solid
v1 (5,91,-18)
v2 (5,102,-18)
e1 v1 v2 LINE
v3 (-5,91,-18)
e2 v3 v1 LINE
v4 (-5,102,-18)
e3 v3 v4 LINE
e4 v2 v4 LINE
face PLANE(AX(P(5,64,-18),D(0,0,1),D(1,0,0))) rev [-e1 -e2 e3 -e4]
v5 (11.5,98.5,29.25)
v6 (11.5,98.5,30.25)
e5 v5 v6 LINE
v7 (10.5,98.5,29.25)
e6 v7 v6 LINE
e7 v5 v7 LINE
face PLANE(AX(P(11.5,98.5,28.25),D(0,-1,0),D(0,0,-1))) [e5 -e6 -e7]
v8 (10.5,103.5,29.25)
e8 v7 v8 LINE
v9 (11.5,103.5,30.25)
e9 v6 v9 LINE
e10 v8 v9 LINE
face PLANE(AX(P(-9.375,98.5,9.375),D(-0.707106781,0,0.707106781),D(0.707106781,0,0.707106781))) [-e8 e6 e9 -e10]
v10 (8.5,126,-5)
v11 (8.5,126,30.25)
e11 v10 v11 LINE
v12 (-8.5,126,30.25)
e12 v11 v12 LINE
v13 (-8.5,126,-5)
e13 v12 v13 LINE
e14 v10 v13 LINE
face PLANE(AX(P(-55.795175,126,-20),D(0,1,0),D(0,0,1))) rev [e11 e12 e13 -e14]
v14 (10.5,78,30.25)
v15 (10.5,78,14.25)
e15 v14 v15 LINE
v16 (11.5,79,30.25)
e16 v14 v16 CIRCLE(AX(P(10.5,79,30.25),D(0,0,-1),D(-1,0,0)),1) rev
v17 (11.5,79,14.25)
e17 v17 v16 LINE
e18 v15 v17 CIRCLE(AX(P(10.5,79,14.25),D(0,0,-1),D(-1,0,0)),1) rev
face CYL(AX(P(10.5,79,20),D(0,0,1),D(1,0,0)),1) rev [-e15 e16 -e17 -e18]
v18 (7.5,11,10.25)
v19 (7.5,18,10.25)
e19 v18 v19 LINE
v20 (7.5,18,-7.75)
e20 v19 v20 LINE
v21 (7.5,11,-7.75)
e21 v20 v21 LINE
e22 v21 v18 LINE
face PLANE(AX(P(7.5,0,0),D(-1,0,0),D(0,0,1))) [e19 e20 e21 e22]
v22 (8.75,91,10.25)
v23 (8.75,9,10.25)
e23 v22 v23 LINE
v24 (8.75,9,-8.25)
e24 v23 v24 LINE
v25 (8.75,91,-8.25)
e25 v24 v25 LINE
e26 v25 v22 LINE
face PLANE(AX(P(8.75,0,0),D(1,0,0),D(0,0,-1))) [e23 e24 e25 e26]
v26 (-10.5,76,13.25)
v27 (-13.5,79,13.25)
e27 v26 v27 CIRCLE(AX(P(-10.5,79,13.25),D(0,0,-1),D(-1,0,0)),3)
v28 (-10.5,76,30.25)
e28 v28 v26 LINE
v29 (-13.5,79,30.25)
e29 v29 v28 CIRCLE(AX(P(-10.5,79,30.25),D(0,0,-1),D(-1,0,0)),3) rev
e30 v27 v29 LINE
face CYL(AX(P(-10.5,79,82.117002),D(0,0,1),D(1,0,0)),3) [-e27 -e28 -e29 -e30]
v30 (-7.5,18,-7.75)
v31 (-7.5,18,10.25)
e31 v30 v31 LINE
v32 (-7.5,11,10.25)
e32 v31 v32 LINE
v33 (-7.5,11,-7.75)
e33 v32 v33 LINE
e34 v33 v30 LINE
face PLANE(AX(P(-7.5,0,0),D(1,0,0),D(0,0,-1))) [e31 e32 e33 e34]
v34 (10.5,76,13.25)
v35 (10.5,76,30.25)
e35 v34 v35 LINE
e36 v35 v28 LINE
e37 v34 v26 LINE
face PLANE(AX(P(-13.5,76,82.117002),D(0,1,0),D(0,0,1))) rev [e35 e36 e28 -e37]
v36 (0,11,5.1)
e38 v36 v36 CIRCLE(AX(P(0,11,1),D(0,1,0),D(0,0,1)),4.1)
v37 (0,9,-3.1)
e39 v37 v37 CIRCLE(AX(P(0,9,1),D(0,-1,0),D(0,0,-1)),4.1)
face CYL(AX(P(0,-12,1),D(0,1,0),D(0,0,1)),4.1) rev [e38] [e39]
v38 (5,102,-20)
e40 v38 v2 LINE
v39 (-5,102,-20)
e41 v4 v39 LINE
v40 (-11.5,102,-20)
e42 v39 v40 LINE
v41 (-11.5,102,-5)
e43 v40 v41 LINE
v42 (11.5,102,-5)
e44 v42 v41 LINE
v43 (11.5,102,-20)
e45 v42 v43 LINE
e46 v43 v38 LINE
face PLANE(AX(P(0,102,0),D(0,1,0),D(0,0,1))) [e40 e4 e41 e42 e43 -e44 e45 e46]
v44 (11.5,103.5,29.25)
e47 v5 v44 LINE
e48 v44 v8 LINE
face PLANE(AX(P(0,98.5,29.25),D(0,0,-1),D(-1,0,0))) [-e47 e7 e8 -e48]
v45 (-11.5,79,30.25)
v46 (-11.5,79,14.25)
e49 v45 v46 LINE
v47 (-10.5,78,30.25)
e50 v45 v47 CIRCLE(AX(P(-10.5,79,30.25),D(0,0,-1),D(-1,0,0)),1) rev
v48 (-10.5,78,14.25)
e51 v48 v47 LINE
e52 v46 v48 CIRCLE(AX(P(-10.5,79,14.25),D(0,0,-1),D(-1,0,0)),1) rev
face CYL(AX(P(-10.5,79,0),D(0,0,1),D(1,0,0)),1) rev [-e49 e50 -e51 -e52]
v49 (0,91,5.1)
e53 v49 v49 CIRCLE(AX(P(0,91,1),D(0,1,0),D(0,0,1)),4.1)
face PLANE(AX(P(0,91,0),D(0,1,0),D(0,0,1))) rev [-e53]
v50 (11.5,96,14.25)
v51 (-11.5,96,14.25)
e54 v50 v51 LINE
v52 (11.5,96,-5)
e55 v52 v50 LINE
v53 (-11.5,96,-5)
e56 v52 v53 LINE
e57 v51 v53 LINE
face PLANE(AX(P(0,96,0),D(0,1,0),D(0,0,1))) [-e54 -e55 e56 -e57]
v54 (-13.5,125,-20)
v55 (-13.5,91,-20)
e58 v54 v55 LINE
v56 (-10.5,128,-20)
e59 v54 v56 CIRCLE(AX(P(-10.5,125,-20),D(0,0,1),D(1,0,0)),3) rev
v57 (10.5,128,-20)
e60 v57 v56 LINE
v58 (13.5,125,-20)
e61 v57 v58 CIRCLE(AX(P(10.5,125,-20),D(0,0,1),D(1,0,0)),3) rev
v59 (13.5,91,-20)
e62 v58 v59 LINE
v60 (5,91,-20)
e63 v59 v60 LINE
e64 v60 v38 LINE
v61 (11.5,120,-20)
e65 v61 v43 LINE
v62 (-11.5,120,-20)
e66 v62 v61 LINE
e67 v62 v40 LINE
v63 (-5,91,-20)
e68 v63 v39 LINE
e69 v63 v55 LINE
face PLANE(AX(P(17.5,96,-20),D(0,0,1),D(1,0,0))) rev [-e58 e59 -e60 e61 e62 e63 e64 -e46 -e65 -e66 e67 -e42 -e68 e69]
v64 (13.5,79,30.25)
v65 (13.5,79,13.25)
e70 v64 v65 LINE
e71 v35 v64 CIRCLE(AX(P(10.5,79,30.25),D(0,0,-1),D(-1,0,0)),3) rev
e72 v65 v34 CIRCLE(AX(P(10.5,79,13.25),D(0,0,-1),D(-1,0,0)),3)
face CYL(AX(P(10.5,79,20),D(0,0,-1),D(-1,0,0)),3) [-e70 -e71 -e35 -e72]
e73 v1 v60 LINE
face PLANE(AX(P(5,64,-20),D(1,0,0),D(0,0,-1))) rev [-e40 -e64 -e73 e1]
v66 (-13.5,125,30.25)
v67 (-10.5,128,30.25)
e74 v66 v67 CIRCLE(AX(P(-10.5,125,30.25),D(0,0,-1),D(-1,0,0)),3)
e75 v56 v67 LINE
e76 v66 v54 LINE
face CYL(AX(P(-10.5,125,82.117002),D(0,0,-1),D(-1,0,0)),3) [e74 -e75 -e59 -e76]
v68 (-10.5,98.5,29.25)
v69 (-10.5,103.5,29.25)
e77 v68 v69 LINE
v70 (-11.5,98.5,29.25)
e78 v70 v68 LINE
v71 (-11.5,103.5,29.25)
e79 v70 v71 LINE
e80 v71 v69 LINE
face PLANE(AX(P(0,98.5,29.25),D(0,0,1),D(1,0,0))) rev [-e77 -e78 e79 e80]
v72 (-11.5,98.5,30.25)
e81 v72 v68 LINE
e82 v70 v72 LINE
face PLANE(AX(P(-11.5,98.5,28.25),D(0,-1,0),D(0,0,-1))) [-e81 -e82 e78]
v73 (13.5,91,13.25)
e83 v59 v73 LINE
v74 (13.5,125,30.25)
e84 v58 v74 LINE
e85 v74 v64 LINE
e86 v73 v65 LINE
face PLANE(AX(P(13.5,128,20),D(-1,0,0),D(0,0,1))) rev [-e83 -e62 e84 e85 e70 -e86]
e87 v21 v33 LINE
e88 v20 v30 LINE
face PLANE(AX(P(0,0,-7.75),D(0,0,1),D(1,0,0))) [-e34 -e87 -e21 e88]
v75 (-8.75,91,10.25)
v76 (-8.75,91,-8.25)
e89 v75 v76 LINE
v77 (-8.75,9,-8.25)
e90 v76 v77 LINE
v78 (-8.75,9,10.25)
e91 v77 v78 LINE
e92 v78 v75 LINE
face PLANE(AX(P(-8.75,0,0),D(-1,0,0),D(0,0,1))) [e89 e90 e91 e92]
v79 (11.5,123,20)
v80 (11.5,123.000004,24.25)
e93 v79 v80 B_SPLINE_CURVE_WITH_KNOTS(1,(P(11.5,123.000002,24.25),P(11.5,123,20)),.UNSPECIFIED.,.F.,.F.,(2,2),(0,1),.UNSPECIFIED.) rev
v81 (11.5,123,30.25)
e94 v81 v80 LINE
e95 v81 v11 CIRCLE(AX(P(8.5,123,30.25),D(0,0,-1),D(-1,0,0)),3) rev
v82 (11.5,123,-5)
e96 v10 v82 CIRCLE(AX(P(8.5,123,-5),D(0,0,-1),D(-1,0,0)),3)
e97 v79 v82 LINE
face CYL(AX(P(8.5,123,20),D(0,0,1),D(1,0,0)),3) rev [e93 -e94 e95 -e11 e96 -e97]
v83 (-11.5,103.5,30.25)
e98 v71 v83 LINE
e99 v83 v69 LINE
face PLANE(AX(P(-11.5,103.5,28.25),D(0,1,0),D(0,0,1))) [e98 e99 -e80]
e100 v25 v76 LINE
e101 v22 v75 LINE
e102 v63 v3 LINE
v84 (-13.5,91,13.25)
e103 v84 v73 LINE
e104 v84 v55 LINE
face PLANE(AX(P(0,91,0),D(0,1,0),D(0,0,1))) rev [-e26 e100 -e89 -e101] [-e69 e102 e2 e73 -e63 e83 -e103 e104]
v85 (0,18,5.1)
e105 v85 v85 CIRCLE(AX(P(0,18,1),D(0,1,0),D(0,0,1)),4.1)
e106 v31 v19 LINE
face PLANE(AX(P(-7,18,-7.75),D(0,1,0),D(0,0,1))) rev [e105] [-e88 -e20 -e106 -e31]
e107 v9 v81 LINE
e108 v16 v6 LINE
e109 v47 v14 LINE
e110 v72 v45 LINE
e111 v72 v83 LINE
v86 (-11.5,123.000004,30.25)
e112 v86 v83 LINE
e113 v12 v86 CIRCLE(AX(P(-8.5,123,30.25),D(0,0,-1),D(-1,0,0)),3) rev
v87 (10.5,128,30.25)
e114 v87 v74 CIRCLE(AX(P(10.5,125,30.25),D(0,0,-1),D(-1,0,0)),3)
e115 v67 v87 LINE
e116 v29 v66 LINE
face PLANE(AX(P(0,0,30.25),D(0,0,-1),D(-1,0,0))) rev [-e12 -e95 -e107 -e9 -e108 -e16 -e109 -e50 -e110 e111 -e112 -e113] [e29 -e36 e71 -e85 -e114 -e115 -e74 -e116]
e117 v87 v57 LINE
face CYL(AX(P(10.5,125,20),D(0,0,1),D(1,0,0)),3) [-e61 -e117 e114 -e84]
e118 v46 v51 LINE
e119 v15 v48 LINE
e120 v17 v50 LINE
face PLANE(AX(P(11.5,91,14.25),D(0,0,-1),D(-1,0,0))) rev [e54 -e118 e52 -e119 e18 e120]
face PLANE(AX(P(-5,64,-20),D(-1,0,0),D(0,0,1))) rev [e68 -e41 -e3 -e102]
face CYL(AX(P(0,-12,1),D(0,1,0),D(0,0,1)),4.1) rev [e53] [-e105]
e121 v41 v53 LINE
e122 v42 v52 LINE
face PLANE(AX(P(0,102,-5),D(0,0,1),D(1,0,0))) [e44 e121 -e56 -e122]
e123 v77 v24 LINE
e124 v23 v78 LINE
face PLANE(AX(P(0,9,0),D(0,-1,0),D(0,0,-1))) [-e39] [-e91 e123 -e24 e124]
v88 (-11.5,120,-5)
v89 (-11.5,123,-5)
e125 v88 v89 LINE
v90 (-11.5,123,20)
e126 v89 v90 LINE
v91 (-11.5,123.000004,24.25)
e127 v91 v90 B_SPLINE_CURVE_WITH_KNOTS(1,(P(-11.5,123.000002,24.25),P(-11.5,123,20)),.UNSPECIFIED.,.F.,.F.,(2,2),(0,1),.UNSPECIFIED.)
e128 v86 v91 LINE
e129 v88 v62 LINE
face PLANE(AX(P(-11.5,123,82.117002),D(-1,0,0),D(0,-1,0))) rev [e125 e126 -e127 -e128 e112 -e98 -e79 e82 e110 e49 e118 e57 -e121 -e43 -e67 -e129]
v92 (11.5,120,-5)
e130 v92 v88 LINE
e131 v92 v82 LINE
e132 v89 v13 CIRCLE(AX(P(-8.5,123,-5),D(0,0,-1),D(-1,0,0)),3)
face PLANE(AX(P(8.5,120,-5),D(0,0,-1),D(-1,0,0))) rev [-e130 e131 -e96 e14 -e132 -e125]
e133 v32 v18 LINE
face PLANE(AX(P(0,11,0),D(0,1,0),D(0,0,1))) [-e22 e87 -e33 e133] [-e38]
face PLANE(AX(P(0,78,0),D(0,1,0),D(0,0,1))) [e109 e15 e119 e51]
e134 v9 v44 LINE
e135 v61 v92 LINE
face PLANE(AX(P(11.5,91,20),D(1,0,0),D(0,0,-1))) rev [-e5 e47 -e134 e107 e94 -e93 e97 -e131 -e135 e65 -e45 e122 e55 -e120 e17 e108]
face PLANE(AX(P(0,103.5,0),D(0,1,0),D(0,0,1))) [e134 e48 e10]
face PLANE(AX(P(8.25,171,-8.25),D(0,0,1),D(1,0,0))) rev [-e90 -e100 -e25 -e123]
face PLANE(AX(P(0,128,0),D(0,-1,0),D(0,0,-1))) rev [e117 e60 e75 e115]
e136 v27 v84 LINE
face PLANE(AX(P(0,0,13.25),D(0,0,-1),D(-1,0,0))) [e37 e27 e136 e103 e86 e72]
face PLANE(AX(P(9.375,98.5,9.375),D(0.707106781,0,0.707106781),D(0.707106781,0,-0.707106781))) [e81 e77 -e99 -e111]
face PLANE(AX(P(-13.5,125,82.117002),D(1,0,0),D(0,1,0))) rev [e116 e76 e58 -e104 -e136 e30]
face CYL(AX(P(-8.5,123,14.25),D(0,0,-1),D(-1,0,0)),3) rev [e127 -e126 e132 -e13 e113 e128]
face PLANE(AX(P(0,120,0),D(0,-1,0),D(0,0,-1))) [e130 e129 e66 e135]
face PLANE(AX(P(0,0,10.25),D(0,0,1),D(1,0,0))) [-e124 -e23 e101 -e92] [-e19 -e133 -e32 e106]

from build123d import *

# Parameters (mm, degrees)
SKETCH1_W                = 20
SKETCH1_H                = 20
SKETCH1_R                = 4
SKETCH1_H_2              = 10
BOSS_EXTRUDE2_DEPTH      = 2
SKETCH2_W                = 45
SKETCH2_H                = 60
SKETCH2_W_2              = 43
SKETCH2_H_2              = 58
BOSS_EXTRUDE3_DEPTH      = 4
SKETCH6_W                = 45
SKETCH6_H                = 30
BOSS_EXTRUDE4_DEPTH      = 2
CUT_EXTRUDE4_DEPTH       = 4
BOSS_EXTRUDE5_DEPTH      = 7
BOSS_EXTRUDE5_2_DEPTH    = 7
BOSS_EXTRUDE5_3_DEPTH    = 7
SKETCH11_W               = 19
SKETCH11_H               = 19
BOSS_EXTRUDE6_DEPTH      = 2
SKETCH14_R               = 4
CUT_EXTRUDE7_DEPTH       = 19
SKETCH15_W               = 1
SKETCH15_H               = 17
SKETCH15_H_2             = 1
BOSS_EXTRUDE7_DEPTH      = 80
SKETCH16_W               = 16.5
SKETCH16_H               = 16.5
BOSS_EXTRUDE8_DEPTH      = 80
SKETCH17_R               = 4
CUT_EXTRUDE8_DEPTH       = 193
SKETCH18_W               = 105.72576136
SKETCH18_H               = 91
CUT_EXTRUDE9_DEPTH       = 193
SKETCH19_W               = 10.5
SKETCH19_H               = 2
CUT_EXTRUDE10_DEPTH      = 193
SKETCH20_W               = 16.5
SKETCH20_H               = 16.5
SKETCH20_R               = 4
BOSS_EXTRUDE10_DEPTH     = 80
SKETCH21_W               = 16.5
SKETCH21_H               = 16.5
SKETCH21_R               = 4
CUT_EXTRUDE11_DEPTH      = 80
SKETCH22_W               = 14
SKETCH22_H               = 5
CUT_EXTRUDE12_DEPTH      = 16
SKETCH24_W               = 16.5
SKETCH24_H               = 80
SKETCH24_W_2             = 14
SKETCH24_H_2             = 5
BOSS_EXTRUDE11_DEPTH     = 2
SKETCH25_R               = 4.1
SKETCH25_R_2             = 4
CUT_EXTRUDE14_DEPTH      = 103
SKETCH26_W               = 35
SKETCH26_H               = 40
BOSS_EXTRUDE12_DEPTH     = 5
SKETCH27_W               = 23
SKETCH27_H               = 5.75
CUT_EXTRUDE17_DEPTH      = 5
SKETCH28_W               = 2
SKETCH28_H               = 40
BOSS_EXTRUDE13_DEPTH     = 32
SKETCH29_W               = 4
SKETCH29_H               = 40
CUT_EXTRUDE18_DEPTH      = 32
SKETCH30_W               = 4
SKETCH30_H               = 40
CUT_EXTRUDE19_DEPTH      = 32
SKETCH31_W               = 10
SKETCH31_H               = 2
CUT_EXTRUDE20_DEPTH      = 32
SKETCH34_W               = 44.25
SKETCH34_H               = 2
BOSS_EXTRUDE15_DEPTH     = 23
FILLET1_R                = 3
FILLET2_R                = 3
FILLET3_R                = 3
FILLET4_R                = 3
BOSS_EXTRUDE16_DEPTH     = 20
SKETCH36_W               = 10
SKETCH36_H               = 2
BOSS_EXTRUDE17_DEPTH     = 23
SKETCH37_W               = 27
SKETCH37_H               = 20
CUT_EXTRUDE23_DEPTH      = 1
SKETCH42_W               = 1
SKETCH42_H               = 5
BOSS_EXTRUDE22_DEPTH     = 2
SKETCH44_W               = 1
SKETCH44_H               = 2
BOSS_EXTRUDE23_DEPTH     = 2
SKETCH46_W               = 1
SKETCH46_H               = 2
BOSS_EXTRUDE24_DEPTH     = 3
SKETCH47_W               = 16.5
SKETCH47_H               = 18.5
SKETCH47_R               = 4.1
BOSS_EXTRUDE25_DEPTH     = 2
SKETCH50_W               = 14
SKETCH50_H               = 18
SKETCH50_R               = 4.1
CUT_EXTRUDE26_DEPTH      = 2
SKETCH51_W               = 18
SKETCH51_H               = 7
CUT_EXTRUDE27_DEPTH      = 0.5
SKETCH52_W               = 18
SKETCH52_H               = 7
CUT_EXTRUDE28_DEPTH      = 0.5
SKETCH53_W               = 18.5
SKETCH53_H               = 82
BOSS_EXTRUDE26_DEPTH     = 0.5
SKETCH54_W               = 18.5
SKETCH54_H               = 82
BOSS_EXTRUDE27_DEPTH     = 0.5
BOSS_EXTRUDE30_DEPTH     = 5
CUT_EXTRUDE31_REACH      = 138.104
SKETCH61_W               = 23
SKETCH61_H               = 5
CUT_EXTRUDE32_DEPTH      = 25
CUT_EXTRUDE32_DEPTH_BACK = 5
SKETCH62_W               = 6.75
SKETCH62_H               = 5
BOSS_EXTRUDE31_DEPTH     = 10.25
BOSS_EXTRUDE32_DEPTH     = 6
SKETCH65_W               = 23
SKETCH65_H               = 2
BOSS_EXTRUDE33_DEPTH     = 6
FILLET5_R                = 3
FILLET6_R                = 3
FILLET7_R                = 1
FILLET8_R                = 1
SKETCH66_W               = 1
SKETCH66_H               = 1
CUT_EXTRUDE33_DEPTH      = 5
BOSS_EXTRUDE34_DEPTH     = 6
SKETCH68_W               = 17
SKETCH68_H               = 15
BOSS_EXTRUDE35_DEPTH     = 6
BOSS_EXTRUDE37_DEPTH     = 15
SKETCH72_W               = 3
SKETCH72_H               = 15
BOSS_EXTRUDE38_DEPTH     = 3


# Read off the part's stored shape, not the designer's step: Boss-Extrude16, Boss-Extrude32
with BuildPart() as part:
    # Sketch1 → Boss-Extrude2 (new body)
    # profile 1 of 6: a face of its own
    with BuildSketch(Plane(origin=(0, 0, 0), x_dir=(1, 0, 0), z_dir=(0, 1, 0))):
        Polygon((-22.5, 10), (-10, 10), (10, 10), (22.5, 10), (22.5, 70), (-22.5, 70), align=None)
    # profile 2 of 6: a face of its own
    with BuildSketch(Plane(origin=(0, 0, 0), x_dir=(1, 0, 0), z_dir=(0, 1, 0))):
        Polygon((-22.5, 10), (-10, -10), (-10, 10), align=None)
    # profile 3 of 6: a face of its own
    with BuildSketch(Plane(origin=(0, 0, 0), x_dir=(1, 0, 0), z_dir=(0, 1, 0))):
        Polygon((10, 10), (10, -10), (22.5, 10), align=None)
    # profile 4 of 6: a face of its own
    with BuildSketch(Plane(origin=(0, 0, 0), x_dir=(1, 0, 0), z_dir=(0, 1, 0))):
        Rectangle(SKETCH1_W, SKETCH1_H)
        Circle(SKETCH1_R, mode=Mode.SUBTRACT)
    # profile 5 of 6: a face of its own
    with BuildSketch(Plane(origin=(0, 0, 0), x_dir=(1, 0, 0), z_dir=(0, 1, 0))):
        Circle(SKETCH1_R)
    # profile 6 of 6: a face of its own
    with BuildSketch(Plane(origin=(0, 0, 0), x_dir=(1, 0, 0), z_dir=(0, 1, 0))):
        with Locations((0, -15)):
            Rectangle(SKETCH1_W, SKETCH1_H_2)
    extrude(amount=BOSS_EXTRUDE2_DEPTH)

    # Sketch2 → Boss-Extrude3 (add)
    with BuildSketch(Plane(origin=(0, 2, 0), x_dir=(1, 0, 0), z_dir=(0, 1, 0))):
        with Locations((0, 40)):
            Rectangle(SKETCH2_W, SKETCH2_H)
        with Locations((0, 40)):
            Rectangle(SKETCH2_W_2, SKETCH2_H_2, mode=Mode.SUBTRACT)
    extrude(amount=BOSS_EXTRUDE3_DEPTH)

    # Sketch6 → Boss-Extrude4 (add)
    with BuildSketch(Plane(origin=(0, 2, 0), x_dir=(1, 0, 0), z_dir=(0, 1, 0))):
        with Locations((0, -5)):
            Rectangle(SKETCH6_W, SKETCH6_H)
    extrude(amount=-BOSS_EXTRUDE4_DEPTH)

    # Sketch7 → Cut-Extrude4 (cut)
    with BuildSketch(Plane(origin=(0, 2, 0), x_dir=(1, 0, 0), z_dir=(0, 1, 0))):
        with BuildLine():
            Line((9.5, 9.5), (-9.5, 9.5))
            Line((-9.5, 9.5), (-9.5, 2.122498999))
            ThreePointArc((-9.5, 2.122498999), (0, 9), (9.5, 2.122498999))
            Line((9.5, 2.122498999), (9.5, 9.5))
        make_face()
        with BuildLine():
            ThreePointArc((-5.267826876, -9.5), (-7.858215886, -7.184532568), (-9.5, -4.122498999))
            Line((-9.5, -4.122498999), (-9.5, -9.5))
            Line((-9.5, -9.5), (-5.267826876, -9.5))
        make_face()
        with BuildLine():
            Line((9.5, -9.5), (9.5, -4.122498999))
            ThreePointArc((9.5, -4.122498999), (7.858215886, -7.184532568), (5.267826876, -9.5))
            Line((5.267826876, -9.5), (9.5, -9.5))
        make_face()
    extrude(amount=-CUT_EXTRUDE4_DEPTH, mode=Mode.SUBTRACT)


with BuildPart() as body_2:
    # Sketch8 → Boss-Extrude5 (new body)
    with BuildSketch(Plane(origin=(0, 2, 0), x_dir=(1, 0, 0), z_dir=(0, 1, 0))):
        with BuildLine():
            Line((9.5, 2.122498999), (9.5, 9.5))
            Line((9.5, 9.5), (-9.5, 9.5))
            Line((-9.5, 9.5), (-9.5, 2.122498999))
            ThreePointArc((-9.5, 2.122498999), (0, 9), (9.5, 2.122498999))
        make_face()
    extrude(amount=BOSS_EXTRUDE5_DEPTH)



with BuildPart() as body_3:
    # Sketch8 → Boss-Extrude5 2 (new body)
    with BuildSketch(Plane(origin=(0, 2, 0), x_dir=(1, 0, 0), z_dir=(0, 1, 0))):
        with BuildLine():
            Line((-9.5, -9.5), (-5.267826876, -9.5))
            ThreePointArc((-5.267826876, -9.5), (-7.858215886, -7.184532568), (-9.5, -4.122498999))
            Line((-9.5, -4.122498999), (-9.5, -9.5))
        make_face()
    extrude(amount=BOSS_EXTRUDE5_2_DEPTH)


with BuildPart() as body_4:
    # Sketch8 → Boss-Extrude5 3 (new body)
    with BuildSketch(Plane(origin=(0, 2, 0), x_dir=(1, 0, 0), z_dir=(0, 1, 0))):
        with BuildLine():
            Line((9.5, -9.5), (9.5, -4.122498999))
            ThreePointArc((9.5, -4.122498999), (7.858215886, -7.184532568), (5.267826876, -9.5))
            Line((5.267826876, -9.5), (9.5, -9.5))
        make_face()
    extrude(amount=BOSS_EXTRUDE5_3_DEPTH)


with BuildPart() as body_2_1:
    add(body_2.part)

    add(body_3.part)  # Boss-Extrude6 merges body 3

    add(body_4.part)  # Boss-Extrude6 merges body 4
    # Sketch11 → Boss-Extrude6 (add)
    with BuildSketch(Plane(origin=(0, 9, 0), x_dir=(1, 0, 0), z_dir=(0, 1, 0))):
        Rectangle(SKETCH11_W, SKETCH11_H)
    extrude(amount=BOSS_EXTRUDE6_DEPTH)


with BuildPart() as cut_extrude7_tool:
    # Sketch14 → Cut-Extrude7 (new body)
    with BuildSketch(Plane.XZ):
        with Locations(Location((0, 1, 0), (0, 0, 270))):
            Circle(SKETCH14_R)
    extrude(amount=-CUT_EXTRUDE7_DEPTH)


with BuildPart() as part_1:
    add(part.part)

    # Cut-Extrude7: cut by cut_extrude7_tool
    add(cut_extrude7_tool.part, mode=Mode.SUBTRACT)


with BuildPart() as body_2_2:
    add(body_2_1.part)

    # Cut-Extrude7: cut by cut_extrude7_tool
    add(cut_extrude7_tool.part, mode=Mode.SUBTRACT)

    # Sketch15 → Boss-Extrude7 (add)
    with BuildSketch(Plane(origin=(0, 11, 0), x_dir=(1, 0, 0), z_dir=(0, 1, 0))):
        Polygon((-8.5, 8.5), (8.5, 8.5), (8.5, 9.5), (-9.5, 9.5), (-9.5, -9.5), (8.5, -9.5), (8.5, -8.5), (-8.5, -8.5), align=None)
        with Locations((9, 0)):
            Rectangle(SKETCH15_W, SKETCH15_H)
        with Locations((9, 9)):
            Rectangle(SKETCH15_W, SKETCH15_H_2)
        with Locations((9, -9)):
            Rectangle(SKETCH15_W, SKETCH15_H_2)
    extrude(amount=BOSS_EXTRUDE7_DEPTH)


with BuildPart() as body_3_2:
    # Sketch16 → Boss-Extrude8 (new body)
    with BuildSketch(Plane(origin=(0, 91, 0), x_dir=(1, 0, 0), z_dir=(0, 1, 0))):
        Rectangle(SKETCH16_W, SKETCH16_H)
    extrude(amount=BOSS_EXTRUDE8_DEPTH)

    # Sketch17 → Cut-Extrude8 (cut)
    with BuildSketch(Plane.XZ):
        with Locations(Location((0, 1, 0), (0, 0, 270))):
            Circle(SKETCH17_R)
    extrude(amount=-CUT_EXTRUDE8_DEPTH, mode=Mode.SUBTRACT)

    # Sketch20 → Boss-Extrude10 (add)
    with BuildSketch(Plane.XZ.offset(-91)):
        Rectangle(SKETCH20_W, SKETCH20_H)
        with Locations(Location((0, 1, 0), (0, 0, 270))):
            Circle(SKETCH20_R, mode=Mode.SUBTRACT)
    extrude(amount=BOSS_EXTRUDE10_DEPTH)

    # Sketch21 → Cut-Extrude11 (cut)
    with BuildSketch(Plane(origin=(0, 171, 0), x_dir=(1, 0, 0), z_dir=(0, 1, 0))):
        Rectangle(SKETCH21_W, SKETCH21_H)
        with Locations(Location((0, -1, 0), (0, 0, 90))):
            Circle(SKETCH21_R, mode=Mode.SUBTRACT)
    extrude(amount=-CUT_EXTRUDE11_DEPTH, mode=Mode.SUBTRACT)

    # Sketch22 → Cut-Extrude12 (cut)
    with BuildSketch(Plane.XY.offset(8.25)):
        with Locations((0, 15.5)):
            Rectangle(SKETCH22_W, SKETCH22_H)
    extrude(amount=-CUT_EXTRUDE12_DEPTH, mode=Mode.SUBTRACT)

    # Sketch24 → Boss-Extrude11 (add)
    with BuildSketch(Plane.XY.offset(8.25)):
        with Locations((0, 51)):
            Rectangle(SKETCH24_W, SKETCH24_H)
        with Locations((0, 15.5)):
            Rectangle(SKETCH24_W_2, SKETCH24_H_2, mode=Mode.SUBTRACT)
    extrude(amount=BOSS_EXTRUDE11_DEPTH)

    # Sketch25 → Cut-Extrude14 (cut)
    with BuildSketch(Plane(origin=(0, 91, 0), x_dir=(1, 0, 0), z_dir=(0, 1, 0))):
        with Locations(Location((0, -1, 0), (0, 0, 270))):
            Circle(SKETCH25_R)
        with Locations((0, -1)):
            Circle(SKETCH25_R_2, mode=Mode.SUBTRACT)
    extrude(amount=-CUT_EXTRUDE14_DEPTH, mode=Mode.SUBTRACT)

    # Sketch26 → Boss-Extrude12 (add)
    with BuildSketch(Plane(origin=(0, 91, 0), x_dir=(1, 0, 0), z_dir=(0, 1, 0))):
        Rectangle(SKETCH26_W, SKETCH26_H)
    extrude(amount=BOSS_EXTRUDE12_DEPTH)

    # Sketch27 → Cut-Extrude17 (cut)
    with BuildSketch(Plane(origin=(0, 96, 0), x_dir=(1, 0, 0), z_dir=(0, 1, 0))):
        with Locations((0, -17.125)):
            Rectangle(SKETCH27_W, SKETCH27_H)
    extrude(amount=-CUT_EXTRUDE17_DEPTH, mode=Mode.SUBTRACT)

    # Sketch28 → Boss-Extrude13 (add)
    with BuildSketch(Plane(origin=(0, 96, 0), x_dir=(1, 0, 0), z_dir=(0, 1, 0))):
        with Locations((12.5, 0)):
            Rectangle(SKETCH28_W, SKETCH28_H)
        with Locations((-12.5, 0)):
            Rectangle(SKETCH28_W, SKETCH28_H)
    extrude(amount=BOSS_EXTRUDE13_DEPTH)

    # Sketch29 → Cut-Extrude18 (cut)
    with BuildSketch(Plane(origin=(0, 96, 0), x_dir=(1, 0, 0), z_dir=(0, 1, 0))):
        with Locations((-15.5, 0)):
            Rectangle(SKETCH29_W, SKETCH29_H)
    extrude(amount=-CUT_EXTRUDE18_DEPTH, mode=Mode.SUBTRACT)

    # Sketch30 → Cut-Extrude19 (cut)
    with BuildSketch(Plane(origin=(0, 96, 0), x_dir=(1, 0, 0), z_dir=(0, 1, 0))):
        with Locations((15.5, 0)):
            Rectangle(SKETCH30_W, SKETCH30_H)
    extrude(amount=-CUT_EXTRUDE19_DEPTH, mode=Mode.SUBTRACT)

    # Sketch31 → Cut-Extrude20 (cut)
    with BuildSketch(Plane(origin=(0, 96, 0), x_dir=(1, 0, 0), z_dir=(0, 1, 0))):
        with Locations((0, 19)):
            Rectangle(SKETCH31_W, SKETCH31_H)
    extrude(amount=-CUT_EXTRUDE20_DEPTH, mode=Mode.SUBTRACT)

    # Sketch34 → Boss-Extrude15 (add)
    with BuildSketch(Plane.ZY.offset(-11.5)):
        with Locations((2.125, 127)):
            Rectangle(SKETCH34_W, SKETCH34_H)
    extrude(amount=BOSS_EXTRUDE15_DEPTH)

    # Fillet1
    fillet1_edges = [body_3_2.edges().sort_by_distance(p)[0] for p in [
        (-13.5, 128, 0),
    ]]
    fillet(fillet1_edges, radius=FILLET1_R)

    # Fillet2
    fillet2_edges = [body_3_2.edges().sort_by_distance(p)[0] for p in [
        (13.5, 128, 0),
    ]]
    fillet(fillet2_edges, radius=FILLET2_R)

    # Fillet3
    # the kernel refuses this fillet: 3 mm, written as the material it adds along each edge
    with BuildSketch(Plane(origin=(-11.5, 126, 27.5), x_dir=(1, 0, 0), z_dir=(0, 0, -1))) as fillet3_piece_1_section:
        with BuildLine():
            CenterArc((FILLET3_R, FILLET3_R), FILLET3_R, 180, 90)
            Line((0, FILLET3_R), (0, 0))
            Line((0, 0), (FILLET3_R, 0))
        make_face()
    fillet3_piece_1 = extrude(amount=47.5, mode=Mode.PRIVATE)
    fillet3_piece_1 = split(fillet3_piece_1, bisect_by=Plane(origin=(-10.759146849, 125.389580611, 24.25), z_dir=(0, 0, -1)), keep=Keep.TOP, mode=Mode.PRIVATE)
    fillet3_piece_1 = split(fillet3_piece_1, bisect_by=Plane(origin=(-11.5, 125.389580611, 22.125), z_dir=(1, 0, 0)), keep=Keep.TOP, mode=Mode.PRIVATE)
    fillet3_piece_1 = split(fillet3_piece_1, bisect_by=Plane(origin=(-10.759146849, 125.389580611, 20), z_dir=(0, 0, 1)), keep=Keep.TOP, mode=Mode.PRIVATE)
    add(fillet3_piece_1)
    with BuildSketch(Plane(origin=(-11.5, 126, 20), x_dir=(1, 0, 0), z_dir=(0, 0, -1))) as fillet3_piece_2_section:
        with BuildLine():
            CenterArc((FILLET3_R, FILLET3_R), FILLET3_R, 180, 90)
            Line((0, FILLET3_R), (0, 0))
            Line((0, 0), (FILLET3_R, 0))
        make_face()
    fillet3_piece_2 = extrude(amount=40, mode=Mode.PRIVATE)
    fillet3_piece_2 = split(fillet3_piece_2, bisect_by=Plane(origin=(-11.5, 125.389580611, 0), z_dir=(1, 0, 0)), keep=Keep.TOP, mode=Mode.PRIVATE)
    add(fillet3_piece_2)

    # Fillet4
    # the kernel refuses this fillet: 3 mm, written as the material it adds along each edge
    with BuildSketch(Plane(origin=(11.5, 126, 27.5), x_dir=(0, -1, 0), z_dir=(0, 0, -1))) as fillet4_piece_1_section:
        with BuildLine():
            CenterArc((FILLET4_R, FILLET4_R), FILLET4_R, 180, 90)
            Line((0, FILLET4_R), (0, 0))
            Line((0, 0), (FILLET4_R, 0))
        make_face()
    fillet4_piece_1 = extrude(amount=47.5, mode=Mode.PRIVATE)
    fillet4_piece_1 = split(fillet4_piece_1, bisect_by=Plane(origin=(10.759146849, 125.389580611, 20), z_dir=(0, 0, 1)), keep=Keep.TOP, mode=Mode.PRIVATE)
    fillet4_piece_1 = split(fillet4_piece_1, bisect_by=Plane(origin=(11.5, 125.389580611, 22.125), z_dir=(-1, 0, 0)), keep=Keep.TOP, mode=Mode.PRIVATE)
    fillet4_piece_1 = split(fillet4_piece_1, bisect_by=Plane(origin=(10.759146849, 125.389580611, 24.25), z_dir=(0, 0, -1)), keep=Keep.TOP, mode=Mode.PRIVATE)
    add(fillet4_piece_1)
    with BuildSketch(Plane(origin=(11.5, 126, 20), x_dir=(0, -1, 0), z_dir=(0, 0, -1))) as fillet4_piece_2_section:
        with BuildLine():
            CenterArc((FILLET4_R, FILLET4_R), FILLET4_R, 180, 90)
            Line((0, FILLET4_R), (0, 0))
            Line((0, 0), (FILLET4_R, 0))
        make_face()
    fillet4_piece_2 = extrude(amount=40, mode=Mode.PRIVATE)
    fillet4_piece_2 = split(fillet4_piece_2, bisect_by=Plane(origin=(11.5, 125.389580611, 0), z_dir=(-1, 0, 0)), keep=Keep.TOP, mode=Mode.PRIVATE)
    add(fillet4_piece_2)

    # Boss-Extrude16 outline → Boss-Extrude16 (add)
    with BuildSketch(Plane.XZ.offset(-91)):
        Polygon((11.5, 20), (11.5, 14.25), (-11.5, 14.25), (-11.5, 20), (-13.5, 20), (-13.5, 12.25), (13.5, 12.25), (13.5, 20), align=None)
    extrude(amount=BOSS_EXTRUDE16_DEPTH)

    # Sketch36 → Boss-Extrude17 (add)
    with BuildSketch(Plane.ZY.offset(-11.5)):
        with Locations((19.25, 72)):
            Rectangle(SKETCH36_W, SKETCH36_H)
    extrude(amount=BOSS_EXTRUDE17_DEPTH)

    # Sketch37 → Cut-Extrude23 (cut)
    with BuildSketch(Plane(origin=(0, 0, 12.25), x_dir=(-1, 0, 0), z_dir=(0, 0, -1))):
        with Locations((0, 81)):
            Rectangle(SKETCH37_W, SKETCH37_H)
    extrude(amount=-CUT_EXTRUDE23_DEPTH, mode=Mode.SUBTRACT)

    # Sketch47 → Boss-Extrude25 (add)
    with BuildSketch(Plane.XZ.offset(-11)):
        with Locations((0, 1)):
            Rectangle(SKETCH47_W, SKETCH47_H)
        with Locations(Location((0, 1, 0), (0, 0, 90))):
            Circle(SKETCH47_R, mode=Mode.SUBTRACT)
    extrude(amount=BOSS_EXTRUDE25_DEPTH)

    # Sketch50 → Cut-Extrude26 (cut)
    with BuildSketch(Plane(origin=(0, 13, 0), x_dir=(1, 0, 0), z_dir=(0, 1, 0))):
        with Locations((0, -1.25)):
            Rectangle(SKETCH50_W, SKETCH50_H)
        with Locations(Location((0, -1, 0), (0, 0, 270))):
            Circle(SKETCH50_R, mode=Mode.SUBTRACT)
    extrude(amount=-CUT_EXTRUDE26_DEPTH, mode=Mode.SUBTRACT)

    # Sketch51 → Cut-Extrude27 (cut)
    with BuildSketch(Plane(origin=(-7, 0, 0), x_dir=(0, 0, -1), z_dir=(1, 0, 0))):
        with Locations((-1.25, 14.5)):
            Rectangle(SKETCH51_W, SKETCH51_H)
    extrude(amount=-CUT_EXTRUDE27_DEPTH, mode=Mode.SUBTRACT)

    # Sketch52 → Cut-Extrude28 (cut)
    with BuildSketch(Plane.ZY.offset(-7)):
        with Locations((1.25, 14.5)):
            Rectangle(SKETCH52_W, SKETCH52_H)
    extrude(amount=-CUT_EXTRUDE28_DEPTH, mode=Mode.SUBTRACT)

    # Sketch53 → Boss-Extrude26 (add)
    with BuildSketch(Plane.ZY.offset(8.25)):
        with Locations((1, 50)):
            Rectangle(SKETCH53_W, SKETCH53_H)
    extrude(amount=BOSS_EXTRUDE26_DEPTH)

    # Sketch54 → Boss-Extrude27 (add)
    with BuildSketch(Plane(origin=(8.25, 0, 0), x_dir=(0, 0, -1), z_dir=(1, 0, 0))):
        with Locations((-1, 50)):
            Rectangle(SKETCH54_W, SKETCH54_H)
    extrude(amount=BOSS_EXTRUDE27_DEPTH)

    # Sketch59 → Boss-Extrude30 (add)
    with BuildSketch(Plane(origin=(0, 73, 0), x_dir=(1, 0, 0), z_dir=(0, 1, 0))):
        Polygon((-11.5, -20), (-11.5, -24.25), (11.5, -24.25), (11.5, -20), (11.5, -14.25), (-11.5, -14.25), align=None)
    extrude(amount=BOSS_EXTRUDE30_DEPTH)

    # Cut-Extrude31: up to this face of the body (flat: up to its plane)
    cut_extrude31_end = Plane(body_3_2.part.faces().sort_by_distance((0, 81, 13.25))[0])
    # Sketch61 → Cut-Extrude31 (cut, up to the picked face)
    with BuildSketch(Plane.XY.offset(24.25), mode=Mode.PRIVATE) as cut_extrude31_sk1:
        with Locations((0, 73.5)):
            Rectangle(SKETCH61_W, SKETCH61_H)
    cut_extrude31_tool1 = split(extrude(cut_extrude31_sk1.sketch, amount=-CUT_EXTRUDE31_REACH, mode=Mode.PRIVATE), bisect_by=cut_extrude31_end, keep=Keep.BOTH, mode=Mode.PRIVATE)
    add(cut_extrude31_tool1.solids().sort_by(Axis((0, 73.5, 24.25), (0, 0, -1)))[0], mode=Mode.SUBTRACT)

    # Sketch62 → Cut-Extrude32 (cut, two sides: drawn at the far end of the back side and taken through both)
    with BuildSketch(Plane(origin=(-11.5, 0, 0), x_dir=(0, 0, -1), z_dir=(1, 0, 0)).offset(-CUT_EXTRUDE32_DEPTH_BACK)):
        with Locations((-16.625, 73.5)):
            Rectangle(SKETCH62_W, SKETCH62_H)
    extrude(amount=CUT_EXTRUDE32_DEPTH + CUT_EXTRUDE32_DEPTH_BACK, mode=Mode.SUBTRACT)



with BuildPart() as cut_extrude9_tool:
    # Sketch18 → Cut-Extrude9 (new body)
    with BuildSketch(Plane.ZY.offset(22.5)):
        with Locations((-43.36288068, 45.5)):
            Rectangle(SKETCH18_W, SKETCH18_H)
    extrude(amount=-CUT_EXTRUDE9_DEPTH)


with BuildPart() as part_2:
    add(part_1.part)

    # Cut-Extrude9: cut by cut_extrude9_tool
    add(cut_extrude9_tool.part, mode=Mode.SUBTRACT)

    # Sketch19 → Cut-Extrude10 (cut)
    with BuildSketch(Plane.ZY.offset(22.5)):
        with Locations((14.75, 1)):
            Rectangle(SKETCH19_W, SKETCH19_H)
    extrude(amount=-CUT_EXTRUDE10_DEPTH, mode=Mode.SUBTRACT)


with BuildPart() as body_2_3:
    add(body_2_2.part)

    # Cut-Extrude9: cut by cut_extrude9_tool
    add(cut_extrude9_tool.part, mode=Mode.SUBTRACT)


with BuildPart() as body_2_2_1:
    # Sketch42 → Boss-Extrude22 (new body)
    with BuildSketch(Plane.XY.offset(30.25)):
        with Locations((-11, 101)):
            Rectangle(SKETCH42_W, SKETCH42_H)
    extrude(amount=-BOSS_EXTRUDE22_DEPTH)


with BuildPart() as body_3_3:
    # Sketch44 → Boss-Extrude23 (new body)
    with BuildSketch(Plane.XY.offset(30.25)):
        with Locations((11, 99.5)):
            Rectangle(SKETCH44_W, SKETCH44_H)
    extrude(amount=-BOSS_EXTRUDE23_DEPTH)

    # Sketch46 → Boss-Extrude24 (add)
    with BuildSketch(Plane(origin=(0, 100.5, 0), x_dir=(1, 0, 0), z_dir=(0, 1, 0))):
        with Locations((11, -29.25)):
            Rectangle(SKETCH46_W, SKETCH46_H)
    extrude(amount=BOSS_EXTRUDE24_DEPTH)


with BuildPart() as body_3_2_1:
    add(body_3_2.part)

    add(body_2_2_1.part)  # Boss-Extrude31 merges body 2 2

    add(body_3_3.part)  # Boss-Extrude31 merges body 3 3
    # Sketch63 → Boss-Extrude31 (add)
    with BuildSketch(Plane.XY.offset(20)):
        with BuildLine():
            Line((-13.5, 76), (-11.5, 76))
            Line((-11.5, 76), (-11.5, 78))
            Line((-11.5, 78), (-11.5, 123))
            Line((-11.5, 123), (-11.5, 127.828427125))
            ThreePointArc((-11.5, 127.828427125), (-12.949489743, 126.732050808), (-13.5, 125))
            Line((-13.5, 125), (-13.5, 76))
        make_face()
        with BuildLine():
            Line((11.5, 76), (13.5, 76))
            Line((13.5, 76), (13.5, 125))
            ThreePointArc((13.5, 125), (12.949489743, 126.732050808), (11.5, 127.828427125))
            Line((11.5, 127.828427125), (11.5, 123))
            Line((11.5, 123), (11.5, 78))
            Line((11.5, 78), (11.5, 76))
        make_face()
    extrude(amount=BOSS_EXTRUDE31_DEPTH)

    # Boss-Extrude32 outline → Boss-Extrude32 (add)
    with BuildSketch(Plane.XY.offset(24.25)):
        with BuildLine():
            ThreePointArc((-10.5, 128), (-11.007305936, 127.956795679), (-11.5, 127.828427125))
            Line((-11.5, 127.828427125), (-11.5, 123))
            ThreePointArc((-11.5, 123), (-10.621320344, 125.121320344), (-8.5, 126))
            Line((-8.5, 126), (8.5, 126))
            ThreePointArc((8.5, 126), (10.621320344, 125.121320344), (11.5, 123))
            Line((11.5, 123), (11.5, 127.828427125))
            ThreePointArc((11.5, 127.828427125), (11.007305936, 127.956795679), (10.5, 128))
            Line((10.5, 128), (-10.5, 128))
        make_face()
    extrude(amount=BOSS_EXTRUDE32_DEPTH)

    # Sketch65 → Boss-Extrude33 (add)
    with BuildSketch(Plane.XY.offset(24.25)):
        with Locations((0, 77)):
            Rectangle(SKETCH65_W, SKETCH65_H)
    extrude(amount=BOSS_EXTRUDE33_DEPTH)

    # Fillet5
    fillet5_edges = [body_3_2_1.edges().sort_by_distance(p)[0] for p in [
        (13.5, 76, 21.75),
    ]]
    fillet(fillet5_edges, radius=FILLET5_R)

    # Fillet6
    fillet6_edges = [body_3_2_1.edges().sort_by_distance(p)[0] for p in [
        (-13.5, 76, 21.75),
    ]]
    fillet(fillet6_edges, radius=FILLET6_R)

    # Fillet7
    fillet7_edges = [body_3_2_1.edges().sort_by_distance(p)[0] for p in [
        (-11.5, 78, 22.25),
    ]]
    fillet(fillet7_edges, radius=FILLET7_R)

    # Fillet8
    fillet8_edges = [body_3_2_1.edges().sort_by_distance(p)[0] for p in [
        (11.5, 78, 22.25),
    ]]
    fillet(fillet8_edges, radius=FILLET8_R)

    # Sketch66 → Cut-Extrude33 (cut)
    with BuildSketch(Plane(origin=(0, 103.5, 0), x_dir=(1, 0, 0), z_dir=(0, 1, 0))):
        with Locations((-11, -28.75)):
            Rectangle(SKETCH66_W, SKETCH66_H)
        Polygon((-10.5, -29.25), (-10.5, -30.25), (-11.5, -30.25), align=None)
        Polygon((11.5, -30.25), (10.5, -29.25), (10.5, -30.25), align=None)
        with Locations((11, -28.75)):
            Rectangle(SKETCH66_W, SKETCH66_H)
    extrude(amount=-CUT_EXTRUDE33_DEPTH, mode=Mode.SUBTRACT)

    # Sketch67 → Boss-Extrude34 (add)
    with BuildSketch(Plane(origin=(0, 96, 0), x_dir=(1, 0, 0), z_dir=(0, 1, 0))):
        Polygon((5, 5), (5, 18), (-5, 18), (-5, 20), (-11.5, 20), (-11.5, 5), align=None)
        Polygon((11.5, 20), (5, 20), (5, 18), (5, 5), (11.5, 5), align=None)
    extrude(amount=BOSS_EXTRUDE34_DEPTH)

    # Sketch68 → Boss-Extrude35 (add)
    with BuildSketch(Plane.XZ.offset(-126)):
        with Locations((0, -12.5)):
            Rectangle(SKETCH68_W, SKETCH68_H)
    extrude(amount=BOSS_EXTRUDE35_DEPTH)

    # Sketch71 → Boss-Extrude37 (add)
    with BuildSketch(Plane(origin=(0, 0, -20), x_dir=(-1, 0, 0), z_dir=(0, 0, -1))):
        with BuildLine():
            ThreePointArc((-8.5, 126), (-10.621320344, 125.121320344), (-11.5, 123))
            Line((-11.5, 123), (-8.5, 123))
            Line((-8.5, 123), (-8.5, 126))
        make_face()
        with BuildLine():
            Line((8.5, 123), (11.5, 123))
            ThreePointArc((11.5, 123), (10.621320344, 125.121320344), (8.5, 126))
            Line((8.5, 126), (8.5, 123))
        make_face()
    extrude(amount=-BOSS_EXTRUDE37_DEPTH)

    # Sketch72 → Boss-Extrude38 (add)
    with BuildSketch(Plane.XZ.offset(-123)):
        with Locations((-10, -12.5)):
            Rectangle(SKETCH72_W, SKETCH72_H)
        with Locations((10, -12.5)):
            Rectangle(SKETCH72_W, SKETCH72_H)
    extrude(amount=BOSS_EXTRUDE38_DEPTH)


solid = body_3_2_1.part
